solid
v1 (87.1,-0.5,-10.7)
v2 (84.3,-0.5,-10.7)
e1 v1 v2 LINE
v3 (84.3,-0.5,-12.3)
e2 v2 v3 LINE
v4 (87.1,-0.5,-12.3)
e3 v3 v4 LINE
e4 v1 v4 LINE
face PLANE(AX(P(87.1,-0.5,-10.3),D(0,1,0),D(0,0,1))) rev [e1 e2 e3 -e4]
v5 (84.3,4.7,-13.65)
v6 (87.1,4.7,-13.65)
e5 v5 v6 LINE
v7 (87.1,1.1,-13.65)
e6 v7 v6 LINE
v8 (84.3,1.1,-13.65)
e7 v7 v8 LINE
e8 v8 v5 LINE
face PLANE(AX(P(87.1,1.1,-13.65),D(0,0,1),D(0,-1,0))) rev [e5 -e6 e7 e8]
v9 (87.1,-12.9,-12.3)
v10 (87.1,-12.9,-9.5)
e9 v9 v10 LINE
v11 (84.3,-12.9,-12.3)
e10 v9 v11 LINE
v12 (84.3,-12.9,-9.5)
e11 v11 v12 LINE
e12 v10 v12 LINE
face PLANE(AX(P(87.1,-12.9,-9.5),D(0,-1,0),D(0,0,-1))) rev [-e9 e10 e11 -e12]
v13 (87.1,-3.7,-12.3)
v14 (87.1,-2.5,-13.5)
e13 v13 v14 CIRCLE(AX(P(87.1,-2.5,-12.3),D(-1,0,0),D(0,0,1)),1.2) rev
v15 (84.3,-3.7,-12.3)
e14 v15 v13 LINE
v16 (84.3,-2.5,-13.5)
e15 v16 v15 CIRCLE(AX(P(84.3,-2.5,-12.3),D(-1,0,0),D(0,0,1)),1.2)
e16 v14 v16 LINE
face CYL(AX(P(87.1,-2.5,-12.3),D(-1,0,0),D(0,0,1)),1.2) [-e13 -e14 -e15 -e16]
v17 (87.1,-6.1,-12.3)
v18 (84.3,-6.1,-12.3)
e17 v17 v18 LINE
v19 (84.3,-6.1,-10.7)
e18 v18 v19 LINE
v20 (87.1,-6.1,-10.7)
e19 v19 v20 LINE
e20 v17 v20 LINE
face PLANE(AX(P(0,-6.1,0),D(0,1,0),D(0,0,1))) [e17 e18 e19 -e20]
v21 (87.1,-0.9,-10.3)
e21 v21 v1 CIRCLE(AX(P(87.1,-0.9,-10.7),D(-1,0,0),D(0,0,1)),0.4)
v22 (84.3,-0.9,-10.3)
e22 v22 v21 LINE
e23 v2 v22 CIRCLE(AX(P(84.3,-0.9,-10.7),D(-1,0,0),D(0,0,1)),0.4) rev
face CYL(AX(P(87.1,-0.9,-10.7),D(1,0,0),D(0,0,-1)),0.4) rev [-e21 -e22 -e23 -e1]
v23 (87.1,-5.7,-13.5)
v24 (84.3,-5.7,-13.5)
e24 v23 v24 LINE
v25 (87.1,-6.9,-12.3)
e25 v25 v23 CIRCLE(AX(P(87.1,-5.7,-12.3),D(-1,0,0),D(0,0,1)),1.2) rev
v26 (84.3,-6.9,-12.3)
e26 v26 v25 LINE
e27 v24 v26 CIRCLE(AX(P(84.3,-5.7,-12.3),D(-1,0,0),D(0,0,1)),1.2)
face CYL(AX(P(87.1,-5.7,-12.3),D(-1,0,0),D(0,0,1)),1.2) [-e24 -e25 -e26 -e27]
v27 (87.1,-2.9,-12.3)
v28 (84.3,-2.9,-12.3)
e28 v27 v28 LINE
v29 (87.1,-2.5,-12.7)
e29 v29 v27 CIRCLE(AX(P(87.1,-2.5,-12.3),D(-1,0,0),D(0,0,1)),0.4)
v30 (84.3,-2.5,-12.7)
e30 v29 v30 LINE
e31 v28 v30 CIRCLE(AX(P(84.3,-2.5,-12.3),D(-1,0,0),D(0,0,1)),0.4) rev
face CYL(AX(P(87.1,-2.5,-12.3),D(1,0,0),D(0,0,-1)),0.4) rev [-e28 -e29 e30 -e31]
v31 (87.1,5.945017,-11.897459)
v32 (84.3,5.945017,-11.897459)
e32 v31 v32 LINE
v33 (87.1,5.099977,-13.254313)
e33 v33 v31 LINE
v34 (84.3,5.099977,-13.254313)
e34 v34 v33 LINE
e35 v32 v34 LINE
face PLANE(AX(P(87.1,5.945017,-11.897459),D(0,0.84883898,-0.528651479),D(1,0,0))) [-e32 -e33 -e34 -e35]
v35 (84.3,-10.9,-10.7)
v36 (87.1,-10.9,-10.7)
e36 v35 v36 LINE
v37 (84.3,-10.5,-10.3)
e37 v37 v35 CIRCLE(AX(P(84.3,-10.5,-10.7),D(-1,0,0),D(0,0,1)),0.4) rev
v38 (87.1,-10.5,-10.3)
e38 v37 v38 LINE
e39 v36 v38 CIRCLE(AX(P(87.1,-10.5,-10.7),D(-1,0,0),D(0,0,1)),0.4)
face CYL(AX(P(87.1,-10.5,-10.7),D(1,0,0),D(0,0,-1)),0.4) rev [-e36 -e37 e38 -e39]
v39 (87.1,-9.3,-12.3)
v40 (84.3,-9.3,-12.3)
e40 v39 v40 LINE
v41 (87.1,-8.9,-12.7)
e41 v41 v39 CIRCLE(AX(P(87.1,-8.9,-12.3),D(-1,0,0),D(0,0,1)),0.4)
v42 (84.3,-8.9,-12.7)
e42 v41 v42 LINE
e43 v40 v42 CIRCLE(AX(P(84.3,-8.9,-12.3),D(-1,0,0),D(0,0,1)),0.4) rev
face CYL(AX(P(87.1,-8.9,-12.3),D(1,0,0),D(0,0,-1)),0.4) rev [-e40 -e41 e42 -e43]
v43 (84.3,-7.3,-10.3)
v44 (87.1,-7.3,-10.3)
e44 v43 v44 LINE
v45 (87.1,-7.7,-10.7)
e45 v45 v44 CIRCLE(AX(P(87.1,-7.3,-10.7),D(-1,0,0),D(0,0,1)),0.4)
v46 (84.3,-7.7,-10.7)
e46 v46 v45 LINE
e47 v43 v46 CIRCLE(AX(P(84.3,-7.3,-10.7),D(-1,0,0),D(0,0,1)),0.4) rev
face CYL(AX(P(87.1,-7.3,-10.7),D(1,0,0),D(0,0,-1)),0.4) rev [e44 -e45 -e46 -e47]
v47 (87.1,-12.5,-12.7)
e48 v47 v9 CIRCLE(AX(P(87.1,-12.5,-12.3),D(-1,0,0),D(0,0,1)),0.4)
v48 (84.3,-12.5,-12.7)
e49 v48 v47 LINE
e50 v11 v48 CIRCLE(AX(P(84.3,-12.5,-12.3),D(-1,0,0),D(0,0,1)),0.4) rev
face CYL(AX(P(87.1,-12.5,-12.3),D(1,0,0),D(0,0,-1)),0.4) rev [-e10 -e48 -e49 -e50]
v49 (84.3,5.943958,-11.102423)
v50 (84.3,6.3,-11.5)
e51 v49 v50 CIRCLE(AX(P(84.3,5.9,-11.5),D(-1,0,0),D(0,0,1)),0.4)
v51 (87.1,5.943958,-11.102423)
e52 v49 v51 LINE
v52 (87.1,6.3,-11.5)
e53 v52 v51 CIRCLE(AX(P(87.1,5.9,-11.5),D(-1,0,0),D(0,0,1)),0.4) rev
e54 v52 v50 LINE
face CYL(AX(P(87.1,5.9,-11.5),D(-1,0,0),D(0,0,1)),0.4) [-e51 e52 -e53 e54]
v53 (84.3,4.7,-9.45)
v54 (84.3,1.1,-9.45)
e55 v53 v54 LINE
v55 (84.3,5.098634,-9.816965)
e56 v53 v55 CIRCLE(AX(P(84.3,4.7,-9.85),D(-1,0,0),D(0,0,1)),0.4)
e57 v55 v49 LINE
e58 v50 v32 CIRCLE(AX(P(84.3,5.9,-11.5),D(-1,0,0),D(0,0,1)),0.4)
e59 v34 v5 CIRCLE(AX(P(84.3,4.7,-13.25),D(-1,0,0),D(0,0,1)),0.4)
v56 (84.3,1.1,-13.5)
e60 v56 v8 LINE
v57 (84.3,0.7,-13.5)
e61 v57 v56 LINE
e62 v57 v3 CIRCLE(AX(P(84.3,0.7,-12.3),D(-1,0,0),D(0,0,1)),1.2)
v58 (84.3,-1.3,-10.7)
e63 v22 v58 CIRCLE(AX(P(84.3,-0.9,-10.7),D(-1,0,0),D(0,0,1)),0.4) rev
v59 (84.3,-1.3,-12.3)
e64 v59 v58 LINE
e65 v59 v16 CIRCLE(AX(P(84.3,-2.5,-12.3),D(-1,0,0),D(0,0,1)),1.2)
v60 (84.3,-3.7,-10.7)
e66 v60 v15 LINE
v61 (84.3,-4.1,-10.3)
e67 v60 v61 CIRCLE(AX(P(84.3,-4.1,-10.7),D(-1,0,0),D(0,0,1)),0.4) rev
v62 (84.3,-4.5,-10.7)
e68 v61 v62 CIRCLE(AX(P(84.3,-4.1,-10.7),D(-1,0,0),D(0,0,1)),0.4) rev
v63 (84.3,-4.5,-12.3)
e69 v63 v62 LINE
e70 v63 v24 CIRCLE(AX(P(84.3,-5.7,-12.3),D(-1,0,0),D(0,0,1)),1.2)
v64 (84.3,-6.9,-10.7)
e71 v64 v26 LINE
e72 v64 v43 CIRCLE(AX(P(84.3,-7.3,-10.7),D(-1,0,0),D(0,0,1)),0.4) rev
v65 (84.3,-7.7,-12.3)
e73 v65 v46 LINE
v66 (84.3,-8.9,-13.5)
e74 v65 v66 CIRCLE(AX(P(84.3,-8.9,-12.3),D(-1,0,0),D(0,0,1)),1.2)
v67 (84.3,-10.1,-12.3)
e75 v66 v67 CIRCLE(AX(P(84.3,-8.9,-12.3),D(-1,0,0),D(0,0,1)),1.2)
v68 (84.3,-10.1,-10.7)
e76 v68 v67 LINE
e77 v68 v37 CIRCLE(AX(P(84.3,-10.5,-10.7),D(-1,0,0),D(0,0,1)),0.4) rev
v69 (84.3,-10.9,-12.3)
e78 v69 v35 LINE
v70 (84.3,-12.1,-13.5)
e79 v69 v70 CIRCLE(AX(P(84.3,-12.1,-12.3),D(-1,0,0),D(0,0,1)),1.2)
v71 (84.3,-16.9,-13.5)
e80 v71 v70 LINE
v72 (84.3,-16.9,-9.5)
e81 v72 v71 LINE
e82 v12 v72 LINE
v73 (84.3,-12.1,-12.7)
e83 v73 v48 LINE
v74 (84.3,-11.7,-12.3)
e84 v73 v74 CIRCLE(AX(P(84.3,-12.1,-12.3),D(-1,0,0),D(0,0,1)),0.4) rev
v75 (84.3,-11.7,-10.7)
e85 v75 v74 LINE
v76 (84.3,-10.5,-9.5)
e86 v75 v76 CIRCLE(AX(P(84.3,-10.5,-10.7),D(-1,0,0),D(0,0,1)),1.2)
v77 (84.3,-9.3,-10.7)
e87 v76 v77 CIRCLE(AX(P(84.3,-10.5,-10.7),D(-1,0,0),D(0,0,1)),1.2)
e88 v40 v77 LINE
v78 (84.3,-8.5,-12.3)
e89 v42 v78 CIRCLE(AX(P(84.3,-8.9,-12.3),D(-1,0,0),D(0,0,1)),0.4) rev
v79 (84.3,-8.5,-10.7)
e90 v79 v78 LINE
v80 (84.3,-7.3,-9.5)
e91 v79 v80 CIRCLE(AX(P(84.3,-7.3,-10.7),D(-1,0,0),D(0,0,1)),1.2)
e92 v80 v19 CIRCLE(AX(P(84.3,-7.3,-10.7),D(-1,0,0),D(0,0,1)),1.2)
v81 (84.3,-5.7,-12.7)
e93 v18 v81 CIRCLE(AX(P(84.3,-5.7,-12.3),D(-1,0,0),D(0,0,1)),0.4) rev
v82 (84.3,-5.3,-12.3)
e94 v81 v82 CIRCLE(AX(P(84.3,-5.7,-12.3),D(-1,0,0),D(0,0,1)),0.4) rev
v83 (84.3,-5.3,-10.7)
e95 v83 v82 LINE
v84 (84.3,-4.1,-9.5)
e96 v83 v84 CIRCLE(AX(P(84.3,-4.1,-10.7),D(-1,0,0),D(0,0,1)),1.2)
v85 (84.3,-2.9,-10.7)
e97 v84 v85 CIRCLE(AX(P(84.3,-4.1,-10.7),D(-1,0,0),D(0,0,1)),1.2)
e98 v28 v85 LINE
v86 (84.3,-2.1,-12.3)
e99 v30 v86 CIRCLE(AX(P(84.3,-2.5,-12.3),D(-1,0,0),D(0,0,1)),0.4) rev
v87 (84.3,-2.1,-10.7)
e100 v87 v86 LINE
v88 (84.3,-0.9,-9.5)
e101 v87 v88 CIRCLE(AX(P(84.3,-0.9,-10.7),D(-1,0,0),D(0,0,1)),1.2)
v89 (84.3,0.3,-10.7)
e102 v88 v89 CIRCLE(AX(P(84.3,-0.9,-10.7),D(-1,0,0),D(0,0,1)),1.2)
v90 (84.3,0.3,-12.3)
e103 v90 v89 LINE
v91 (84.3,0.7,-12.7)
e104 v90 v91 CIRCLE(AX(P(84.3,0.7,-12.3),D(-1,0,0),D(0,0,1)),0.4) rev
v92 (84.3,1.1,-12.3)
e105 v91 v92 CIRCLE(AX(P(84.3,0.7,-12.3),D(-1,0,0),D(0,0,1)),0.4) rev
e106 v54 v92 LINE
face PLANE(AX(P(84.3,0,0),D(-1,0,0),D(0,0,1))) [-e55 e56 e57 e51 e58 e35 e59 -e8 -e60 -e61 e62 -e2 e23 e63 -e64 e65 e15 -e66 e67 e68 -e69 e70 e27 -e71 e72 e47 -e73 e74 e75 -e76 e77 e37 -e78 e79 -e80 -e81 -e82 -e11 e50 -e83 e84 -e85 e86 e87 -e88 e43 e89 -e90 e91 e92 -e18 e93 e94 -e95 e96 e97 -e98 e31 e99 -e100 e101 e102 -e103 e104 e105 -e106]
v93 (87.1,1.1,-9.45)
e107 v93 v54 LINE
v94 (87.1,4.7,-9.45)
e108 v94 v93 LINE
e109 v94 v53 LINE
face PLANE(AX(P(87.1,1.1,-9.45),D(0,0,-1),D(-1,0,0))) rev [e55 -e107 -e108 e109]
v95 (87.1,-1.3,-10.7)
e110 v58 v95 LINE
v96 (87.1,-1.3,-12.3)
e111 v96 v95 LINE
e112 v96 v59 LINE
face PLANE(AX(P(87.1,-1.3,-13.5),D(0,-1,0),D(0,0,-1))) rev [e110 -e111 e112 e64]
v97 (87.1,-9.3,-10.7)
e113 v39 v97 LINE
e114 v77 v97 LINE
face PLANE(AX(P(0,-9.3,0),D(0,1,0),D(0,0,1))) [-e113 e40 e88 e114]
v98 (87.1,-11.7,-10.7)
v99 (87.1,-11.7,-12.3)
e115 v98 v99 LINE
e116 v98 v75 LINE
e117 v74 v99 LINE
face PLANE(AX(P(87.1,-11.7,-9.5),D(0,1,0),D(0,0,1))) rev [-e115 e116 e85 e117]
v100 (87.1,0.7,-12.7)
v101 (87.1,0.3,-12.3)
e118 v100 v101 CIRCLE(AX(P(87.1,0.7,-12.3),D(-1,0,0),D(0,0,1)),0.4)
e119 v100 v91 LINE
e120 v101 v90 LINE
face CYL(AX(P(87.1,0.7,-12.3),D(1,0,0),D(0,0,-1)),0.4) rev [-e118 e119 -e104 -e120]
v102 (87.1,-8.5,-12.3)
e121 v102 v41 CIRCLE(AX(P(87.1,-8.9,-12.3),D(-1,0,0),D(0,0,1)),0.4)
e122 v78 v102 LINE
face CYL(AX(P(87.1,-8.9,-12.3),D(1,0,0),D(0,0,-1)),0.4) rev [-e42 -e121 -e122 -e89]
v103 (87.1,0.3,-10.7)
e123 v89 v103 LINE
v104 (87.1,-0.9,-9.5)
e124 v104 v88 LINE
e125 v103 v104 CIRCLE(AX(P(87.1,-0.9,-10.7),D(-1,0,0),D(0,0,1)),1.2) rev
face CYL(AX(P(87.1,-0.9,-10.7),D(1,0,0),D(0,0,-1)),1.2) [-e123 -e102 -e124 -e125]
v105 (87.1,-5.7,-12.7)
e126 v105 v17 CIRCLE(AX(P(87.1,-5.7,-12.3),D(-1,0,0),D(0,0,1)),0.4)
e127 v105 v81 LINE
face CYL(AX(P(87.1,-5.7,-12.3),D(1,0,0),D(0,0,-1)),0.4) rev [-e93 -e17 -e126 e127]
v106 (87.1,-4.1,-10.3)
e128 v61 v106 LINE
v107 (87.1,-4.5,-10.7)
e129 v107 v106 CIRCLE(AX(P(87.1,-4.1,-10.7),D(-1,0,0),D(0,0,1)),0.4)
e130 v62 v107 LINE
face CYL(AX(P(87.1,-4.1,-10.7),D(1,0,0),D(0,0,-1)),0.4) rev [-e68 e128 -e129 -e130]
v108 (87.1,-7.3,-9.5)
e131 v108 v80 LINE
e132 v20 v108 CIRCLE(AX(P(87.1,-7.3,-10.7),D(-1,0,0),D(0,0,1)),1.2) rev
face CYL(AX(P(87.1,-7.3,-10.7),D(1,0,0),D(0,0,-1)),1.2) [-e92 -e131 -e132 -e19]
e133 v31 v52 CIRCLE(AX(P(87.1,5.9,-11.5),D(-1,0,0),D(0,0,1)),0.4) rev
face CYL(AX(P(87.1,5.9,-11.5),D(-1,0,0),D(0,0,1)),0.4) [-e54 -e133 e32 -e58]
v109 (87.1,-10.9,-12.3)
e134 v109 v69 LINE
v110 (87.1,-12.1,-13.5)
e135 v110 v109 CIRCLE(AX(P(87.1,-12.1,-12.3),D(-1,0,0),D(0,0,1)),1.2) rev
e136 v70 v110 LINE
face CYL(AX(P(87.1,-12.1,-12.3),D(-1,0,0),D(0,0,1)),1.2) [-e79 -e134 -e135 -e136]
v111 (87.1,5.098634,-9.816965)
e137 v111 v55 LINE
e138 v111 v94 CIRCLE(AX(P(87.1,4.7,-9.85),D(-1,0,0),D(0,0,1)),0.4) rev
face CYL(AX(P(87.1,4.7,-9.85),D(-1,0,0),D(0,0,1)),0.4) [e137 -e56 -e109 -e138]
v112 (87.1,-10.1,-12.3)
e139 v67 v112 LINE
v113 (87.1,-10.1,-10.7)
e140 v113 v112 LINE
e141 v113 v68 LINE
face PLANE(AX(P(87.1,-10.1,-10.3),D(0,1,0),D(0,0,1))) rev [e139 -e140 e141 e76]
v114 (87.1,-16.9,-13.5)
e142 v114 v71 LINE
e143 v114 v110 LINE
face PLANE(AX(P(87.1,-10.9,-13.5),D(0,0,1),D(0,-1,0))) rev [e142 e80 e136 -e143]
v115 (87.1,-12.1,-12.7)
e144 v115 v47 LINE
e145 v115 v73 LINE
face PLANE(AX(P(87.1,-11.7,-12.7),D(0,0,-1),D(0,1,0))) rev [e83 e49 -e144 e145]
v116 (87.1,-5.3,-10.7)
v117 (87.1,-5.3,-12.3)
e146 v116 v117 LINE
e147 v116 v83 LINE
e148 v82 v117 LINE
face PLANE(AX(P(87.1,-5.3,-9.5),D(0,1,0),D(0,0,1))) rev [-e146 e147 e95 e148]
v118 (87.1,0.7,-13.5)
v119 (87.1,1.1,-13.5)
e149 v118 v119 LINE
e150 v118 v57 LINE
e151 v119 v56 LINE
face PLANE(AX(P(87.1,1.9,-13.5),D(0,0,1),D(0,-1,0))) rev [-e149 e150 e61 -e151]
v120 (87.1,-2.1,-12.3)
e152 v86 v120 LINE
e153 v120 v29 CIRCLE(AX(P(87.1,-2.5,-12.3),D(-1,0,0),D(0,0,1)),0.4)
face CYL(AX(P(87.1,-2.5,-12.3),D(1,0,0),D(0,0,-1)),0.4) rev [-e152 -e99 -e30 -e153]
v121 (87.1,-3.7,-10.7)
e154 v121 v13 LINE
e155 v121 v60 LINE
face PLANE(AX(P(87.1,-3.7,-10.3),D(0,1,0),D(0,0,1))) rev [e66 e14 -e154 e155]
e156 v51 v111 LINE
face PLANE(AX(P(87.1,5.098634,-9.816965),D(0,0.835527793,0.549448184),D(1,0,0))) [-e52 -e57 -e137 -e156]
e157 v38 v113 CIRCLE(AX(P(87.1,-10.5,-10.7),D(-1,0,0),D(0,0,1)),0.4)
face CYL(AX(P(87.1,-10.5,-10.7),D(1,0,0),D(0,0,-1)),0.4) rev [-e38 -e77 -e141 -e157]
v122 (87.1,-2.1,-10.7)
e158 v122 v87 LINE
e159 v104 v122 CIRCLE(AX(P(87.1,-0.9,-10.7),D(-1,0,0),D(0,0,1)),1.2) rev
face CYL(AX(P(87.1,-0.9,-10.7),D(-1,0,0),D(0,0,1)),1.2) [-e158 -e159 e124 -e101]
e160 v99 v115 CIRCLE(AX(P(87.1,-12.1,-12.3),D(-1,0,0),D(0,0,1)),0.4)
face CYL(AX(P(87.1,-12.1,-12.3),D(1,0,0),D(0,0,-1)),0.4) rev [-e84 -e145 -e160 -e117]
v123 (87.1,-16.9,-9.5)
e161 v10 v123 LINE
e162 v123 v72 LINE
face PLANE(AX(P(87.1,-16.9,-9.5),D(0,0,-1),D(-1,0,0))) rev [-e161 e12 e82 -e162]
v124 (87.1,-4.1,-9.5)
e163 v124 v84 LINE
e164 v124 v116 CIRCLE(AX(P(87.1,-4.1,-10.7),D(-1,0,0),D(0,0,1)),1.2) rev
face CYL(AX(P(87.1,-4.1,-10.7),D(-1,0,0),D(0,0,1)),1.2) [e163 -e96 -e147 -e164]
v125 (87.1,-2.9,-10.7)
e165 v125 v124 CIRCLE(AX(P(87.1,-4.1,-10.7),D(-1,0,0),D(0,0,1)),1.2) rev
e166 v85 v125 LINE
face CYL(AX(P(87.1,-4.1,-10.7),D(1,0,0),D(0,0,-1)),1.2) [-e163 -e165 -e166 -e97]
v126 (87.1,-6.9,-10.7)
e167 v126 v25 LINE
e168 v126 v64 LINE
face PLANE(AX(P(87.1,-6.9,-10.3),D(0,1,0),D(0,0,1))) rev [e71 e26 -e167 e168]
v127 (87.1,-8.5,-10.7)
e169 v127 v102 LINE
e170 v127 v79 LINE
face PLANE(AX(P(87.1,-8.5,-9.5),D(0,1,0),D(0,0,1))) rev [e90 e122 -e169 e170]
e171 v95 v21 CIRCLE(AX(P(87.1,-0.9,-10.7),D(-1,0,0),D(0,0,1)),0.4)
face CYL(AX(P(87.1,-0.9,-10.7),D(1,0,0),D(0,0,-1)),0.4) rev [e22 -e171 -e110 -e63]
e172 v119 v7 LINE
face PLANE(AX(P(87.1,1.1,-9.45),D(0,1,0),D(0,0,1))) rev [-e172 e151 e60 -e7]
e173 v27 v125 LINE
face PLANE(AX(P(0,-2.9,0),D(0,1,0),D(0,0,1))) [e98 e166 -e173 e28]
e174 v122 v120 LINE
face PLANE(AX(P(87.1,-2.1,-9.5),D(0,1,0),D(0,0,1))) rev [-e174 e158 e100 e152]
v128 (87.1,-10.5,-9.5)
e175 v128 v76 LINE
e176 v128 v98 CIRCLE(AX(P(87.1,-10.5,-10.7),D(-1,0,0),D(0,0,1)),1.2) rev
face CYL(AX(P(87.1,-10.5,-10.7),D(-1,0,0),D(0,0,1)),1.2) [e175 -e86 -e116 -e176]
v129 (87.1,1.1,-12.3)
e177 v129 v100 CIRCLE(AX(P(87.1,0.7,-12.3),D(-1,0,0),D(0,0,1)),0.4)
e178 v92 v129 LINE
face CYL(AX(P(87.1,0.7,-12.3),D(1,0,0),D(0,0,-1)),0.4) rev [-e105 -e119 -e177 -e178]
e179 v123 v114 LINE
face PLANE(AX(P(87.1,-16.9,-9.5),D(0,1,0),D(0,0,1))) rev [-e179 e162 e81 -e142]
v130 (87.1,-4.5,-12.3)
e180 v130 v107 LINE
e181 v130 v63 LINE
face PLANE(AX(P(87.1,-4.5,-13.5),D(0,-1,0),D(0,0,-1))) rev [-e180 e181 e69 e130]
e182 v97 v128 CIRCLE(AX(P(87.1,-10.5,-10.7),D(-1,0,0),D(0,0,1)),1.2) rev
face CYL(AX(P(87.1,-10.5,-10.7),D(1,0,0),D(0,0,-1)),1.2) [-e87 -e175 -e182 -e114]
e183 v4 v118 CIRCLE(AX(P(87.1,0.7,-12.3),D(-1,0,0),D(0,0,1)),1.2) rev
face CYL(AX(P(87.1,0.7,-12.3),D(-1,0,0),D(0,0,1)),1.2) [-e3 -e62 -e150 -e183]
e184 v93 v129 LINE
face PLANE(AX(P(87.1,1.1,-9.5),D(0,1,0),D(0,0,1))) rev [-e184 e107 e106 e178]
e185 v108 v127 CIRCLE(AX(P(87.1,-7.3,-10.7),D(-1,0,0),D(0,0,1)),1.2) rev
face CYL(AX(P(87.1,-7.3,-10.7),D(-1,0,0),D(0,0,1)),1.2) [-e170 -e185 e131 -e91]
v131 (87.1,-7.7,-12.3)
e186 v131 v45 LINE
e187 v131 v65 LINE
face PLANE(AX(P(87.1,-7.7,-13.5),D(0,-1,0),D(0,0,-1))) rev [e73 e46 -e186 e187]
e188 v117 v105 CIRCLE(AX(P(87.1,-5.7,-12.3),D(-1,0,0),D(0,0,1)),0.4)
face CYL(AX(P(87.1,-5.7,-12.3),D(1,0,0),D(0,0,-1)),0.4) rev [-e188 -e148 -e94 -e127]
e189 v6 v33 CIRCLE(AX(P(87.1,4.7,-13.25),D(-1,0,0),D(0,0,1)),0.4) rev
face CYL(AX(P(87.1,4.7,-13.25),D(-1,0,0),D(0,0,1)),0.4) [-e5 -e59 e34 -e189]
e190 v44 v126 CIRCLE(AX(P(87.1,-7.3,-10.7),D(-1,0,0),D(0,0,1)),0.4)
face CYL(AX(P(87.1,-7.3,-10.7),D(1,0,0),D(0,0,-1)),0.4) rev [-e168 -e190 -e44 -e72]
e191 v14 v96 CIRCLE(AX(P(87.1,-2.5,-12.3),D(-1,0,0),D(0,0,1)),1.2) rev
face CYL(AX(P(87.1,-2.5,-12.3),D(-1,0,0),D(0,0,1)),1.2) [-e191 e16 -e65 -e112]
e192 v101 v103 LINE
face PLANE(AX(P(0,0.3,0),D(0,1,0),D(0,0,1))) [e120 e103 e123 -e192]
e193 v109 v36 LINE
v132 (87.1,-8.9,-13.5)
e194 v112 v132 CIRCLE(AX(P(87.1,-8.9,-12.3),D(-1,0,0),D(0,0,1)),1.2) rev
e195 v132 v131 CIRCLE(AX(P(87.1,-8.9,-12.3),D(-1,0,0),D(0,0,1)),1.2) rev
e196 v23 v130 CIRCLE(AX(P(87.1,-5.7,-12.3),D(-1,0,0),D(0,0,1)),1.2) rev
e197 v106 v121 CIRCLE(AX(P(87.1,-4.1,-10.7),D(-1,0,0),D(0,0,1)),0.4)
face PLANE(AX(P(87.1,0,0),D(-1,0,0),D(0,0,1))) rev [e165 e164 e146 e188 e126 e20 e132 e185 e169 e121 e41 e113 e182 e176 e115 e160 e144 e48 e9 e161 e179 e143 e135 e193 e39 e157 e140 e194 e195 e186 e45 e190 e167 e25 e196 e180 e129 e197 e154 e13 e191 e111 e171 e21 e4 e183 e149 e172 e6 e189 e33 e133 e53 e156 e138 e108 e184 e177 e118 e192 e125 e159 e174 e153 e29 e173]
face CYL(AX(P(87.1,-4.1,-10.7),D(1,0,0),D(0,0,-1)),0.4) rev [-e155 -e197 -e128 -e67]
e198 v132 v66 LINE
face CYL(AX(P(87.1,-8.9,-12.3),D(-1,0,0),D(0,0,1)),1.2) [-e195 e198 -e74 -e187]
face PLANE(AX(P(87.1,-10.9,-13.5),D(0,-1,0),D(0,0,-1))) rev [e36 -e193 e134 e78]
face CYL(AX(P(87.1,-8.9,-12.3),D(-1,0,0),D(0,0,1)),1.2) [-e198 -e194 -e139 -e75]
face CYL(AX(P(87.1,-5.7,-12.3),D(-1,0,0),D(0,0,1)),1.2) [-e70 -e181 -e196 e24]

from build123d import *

# Parameters (mm, degrees)
AUFSATZ_LINEAR_AUSTRAGEN3_DEPTH = 2.8
VERRUNDUNG2_R                   = 0.4
VERRUNDUNG5_R                   = 1.2
VERRUNDUNG6_R                   = 1.2
LINEARES_MUSTER1_COUNT          = 5
LINEARES_MUSTER1_PITCH          = 3.2
SKIZZE5_W                       = 4
SKIZZE5_H                       = 4
SKIZZE5_W_2                     = 4.2
AUFSATZ_LINEAR_AUSTRAGEN4_DEPTH = 2.8
VERRUNDUNG3_R                   = 0.4
VERRUNDUNG4_R                   = 0.4
VERRUNDUNG8_R                   = 1.2
FASE1_START                     = 84.3
FASE1_DEPTH                     = 2.8


with BuildPart() as part:
    # Aufsatz-Linear austragen3: read off the stored shape, not the designer's step
    # Aufsatz-Linear austragen3 outline → Aufsatz-Linear austragen3 (new body)
    with BuildSketch(Plane(origin=(84.3, 0, 0), x_dir=(0, 0, -1), z_dir=(1, 0, 0))):
        Polygon((11.9, 5.1), (11.9, 6.3), (11.1, 6.3), (11.1, 4.3), (12.7, 4.3), (12.7, 3.5), (9.5, 3.5), (9.5, 1.1), (12.7, 1.1), (12.7, -0.1), (13.5, -0.1), (13.5, 1.9), (10.3, 1.9), (10.3, 2.7), (13.5, 2.7), (13.5, 5.1), align=None)
    extrude(amount=AUFSATZ_LINEAR_AUSTRAGEN3_DEPTH)

    # Verrundung2
    verrundung2_edges = [part.edges().sort_by_distance(p)[0] for p in [
        (85.7, 1.9, -10.3),
        (85.7, 2.7, -10.3),
        (85.7, 3.5, -12.7),
        (85.7, 4.3, -12.7),
        (85.7, 6.3, -11.1),
        (85.7, 6.3, -11.9),
        (85.7, 1.1, -12.7),
    ]]
    fillet(verrundung2_edges, radius=VERRUNDUNG2_R - 0.0001)  # a hair under: the kernel refuses the full size


with BuildPart() as body_2:
    # Abspalten1: the piece on the far side of the plane
    add(part.part)
    split(bisect_by=Plane.ZX.offset(3.5), keep=Keep.BOTTOM)

    # Verrundung5
    verrundung5_edges = [body_2.edges().sort_by_distance(p)[0] for p in [
        (85.7, 1.1, -9.5),
        (85.7, 3.5, -9.5),
    ]]
    fillet(verrundung5_edges, radius=VERRUNDUNG5_R - 0.0001)  # a hair under: the kernel refuses the full size


with BuildPart() as part_1:
    add(part.part)

    # Abspalten1
    split(bisect_by=Plane.ZX.offset(3.5), keep=Keep.TOP)

    # Verrundung6
    verrundung6_edges = [part_1.edges().sort_by_distance(p)[0] for p in [
        (85.7, 5.1, -13.5),
    ]]
    fillet(verrundung6_edges, radius=VERRUNDUNG6_R)


with BuildPart() as lineares_muster1_1:
    # Lineares Muster1: pattern copy
    add(body_2.part.moved(Location(Vector(0, -1, 0) * (1 * LINEARES_MUSTER1_PITCH))))


with BuildPart() as lineares_muster1_2:
    # Lineares Muster1: pattern copy
    add(body_2.part.moved(Location(Vector(0, -1, 0) * (2 * LINEARES_MUSTER1_PITCH))))


with BuildPart() as lineares_muster1_3:
    # Lineares Muster1: pattern copy
    add(body_2.part.moved(Location(Vector(0, -1, 0) * (3 * LINEARES_MUSTER1_PITCH))))


with BuildPart() as lineares_muster1_4:
    # Lineares Muster1: pattern copy
    add(body_2.part.moved(Location(Vector(0, -1, 0) * (4 * LINEARES_MUSTER1_PITCH))))

    # Skizze5 → Aufsatz-Linear austragen4 (add)
    with BuildSketch(Plane(origin=(84.3, 0, 0), x_dir=(0, 0, -1), z_dir=(1, 0, 0))):
        with Locations((11.5, -14.9)):
            Rectangle(SKIZZE5_W, SKIZZE5_H)
        with Locations((11.55, 3.1)):
            Rectangle(SKIZZE5_W_2, SKIZZE5_H)
    extrude(amount=AUFSATZ_LINEAR_AUSTRAGEN4_DEPTH)


with BuildPart() as aufsatz_linear_austragen4_piece_1:
    # of the separate pieces the step leaves, piece 1, a body of its own (aufsatz_linear_austragen4_pieces)
    add(lineares_muster1_4.part.solids().sort_by_distance((84.3, -9.3, -10.6999))[0])

    # Verrundung3
    verrundung3_edges = [aufsatz_linear_austragen4_piece_1.edges().sort_by_distance(p)[0] for p in [
        (85.7, -12.9, -12.7),
    ]]
    fillet(verrundung3_edges, radius=VERRUNDUNG3_R)


with BuildPart() as aufsatz_linear_austragen4_piece_2:
    # of the separate pieces the step leaves, piece 2, a body of its own (aufsatz_linear_austragen4_pieces)
    add(lineares_muster1_4.part.solids().sort_by_distance((84.3, 1.1, -9.45))[0])


with BuildPart() as part_2:
    add(part_1.part)

    # Kombinieren1: union body 2, Lineares Muster1_1, Lineares Muster1_2, Lineares Muster1_3, Aufsatz-Linear austragen4 piece 1, Aufsatz-Linear austragen4 piece 2
    add(body_2.part)
    add(lineares_muster1_1.part)
    add(lineares_muster1_2.part)
    add(lineares_muster1_3.part)
    add(aufsatz_linear_austragen4_piece_1.part)
    add(aufsatz_linear_austragen4_piece_2.part)

    # Verrundung4
    verrundung4_edges = [part_2.edges().sort_by_distance(p)[0] for p in [
        (85.7, -9.3, -12.7),
        (85.7, -6.1, -12.7),
        (85.7, -2.9, -12.7),
        (85.7, 0.3, -12.7),
        (85.7, 5.1, -9.45),
        (85.7, 5.1, -13.65),
    ]]
    fillet(verrundung4_edges, radius=VERRUNDUNG4_R)

    # Verrundung8
    verrundung8_edges = [part_2.edges().sort_by_distance(p)[0] for p in [
        (85.7, -0.5, -13.5),
        (85.7, -3.7, -13.5),
        (85.7, -1.3, -13.5),
        (85.7, -6.9, -13.5),
        (85.7, -4.5, -13.5),
        (85.7, -10.1, -13.5),
        (85.7, -7.7, -13.5),
        (85.7, -10.9, -13.5),
    ]]
    fillet(verrundung8_edges, radius=VERRUNDUNG8_R - 0.0001)  # a hair under: the kernel refuses the full size

    # Fase1: read off the stored shape, not the designer's step
    # Fase1 outline → Fase1 (add)
    with BuildSketch(Plane.YZ.offset(FASE1_START)):
        with BuildLine():
            ThreePointArc((5.9, -11.1), (5.922012566, -11.100606151), (5.943958417, -11.102422765))
            Line((5.943958417, -11.102422765), (5.098633526, -9.816964992))
            ThreePointArc((5.098633526, -9.816964992), (5.099658235, -9.833468371), (5.1, -9.85))
            Line((5.1, -9.85), (5.1, -11.1))
            Line((5.1, -11.1), (5.9, -11.1))
        make_face()
        with BuildLine():
            Line((5.099976744, -13.254313255), (5.945017032, -11.897458761))
            ThreePointArc((5.945017032, -11.897458761), (5.922544351, -11.899364185), (5.9, -11.9))
            Line((5.9, -11.9), (5.1, -11.9))
            Line((5.1, -11.9), (5.1, -13.25))
            ThreePointArc((5.1, -13.25), (5.099994186, -13.252156659), (5.099976744, -13.254313255))
        make_face()
    extrude(amount=FASE1_DEPTH)


solid = part_2.part
